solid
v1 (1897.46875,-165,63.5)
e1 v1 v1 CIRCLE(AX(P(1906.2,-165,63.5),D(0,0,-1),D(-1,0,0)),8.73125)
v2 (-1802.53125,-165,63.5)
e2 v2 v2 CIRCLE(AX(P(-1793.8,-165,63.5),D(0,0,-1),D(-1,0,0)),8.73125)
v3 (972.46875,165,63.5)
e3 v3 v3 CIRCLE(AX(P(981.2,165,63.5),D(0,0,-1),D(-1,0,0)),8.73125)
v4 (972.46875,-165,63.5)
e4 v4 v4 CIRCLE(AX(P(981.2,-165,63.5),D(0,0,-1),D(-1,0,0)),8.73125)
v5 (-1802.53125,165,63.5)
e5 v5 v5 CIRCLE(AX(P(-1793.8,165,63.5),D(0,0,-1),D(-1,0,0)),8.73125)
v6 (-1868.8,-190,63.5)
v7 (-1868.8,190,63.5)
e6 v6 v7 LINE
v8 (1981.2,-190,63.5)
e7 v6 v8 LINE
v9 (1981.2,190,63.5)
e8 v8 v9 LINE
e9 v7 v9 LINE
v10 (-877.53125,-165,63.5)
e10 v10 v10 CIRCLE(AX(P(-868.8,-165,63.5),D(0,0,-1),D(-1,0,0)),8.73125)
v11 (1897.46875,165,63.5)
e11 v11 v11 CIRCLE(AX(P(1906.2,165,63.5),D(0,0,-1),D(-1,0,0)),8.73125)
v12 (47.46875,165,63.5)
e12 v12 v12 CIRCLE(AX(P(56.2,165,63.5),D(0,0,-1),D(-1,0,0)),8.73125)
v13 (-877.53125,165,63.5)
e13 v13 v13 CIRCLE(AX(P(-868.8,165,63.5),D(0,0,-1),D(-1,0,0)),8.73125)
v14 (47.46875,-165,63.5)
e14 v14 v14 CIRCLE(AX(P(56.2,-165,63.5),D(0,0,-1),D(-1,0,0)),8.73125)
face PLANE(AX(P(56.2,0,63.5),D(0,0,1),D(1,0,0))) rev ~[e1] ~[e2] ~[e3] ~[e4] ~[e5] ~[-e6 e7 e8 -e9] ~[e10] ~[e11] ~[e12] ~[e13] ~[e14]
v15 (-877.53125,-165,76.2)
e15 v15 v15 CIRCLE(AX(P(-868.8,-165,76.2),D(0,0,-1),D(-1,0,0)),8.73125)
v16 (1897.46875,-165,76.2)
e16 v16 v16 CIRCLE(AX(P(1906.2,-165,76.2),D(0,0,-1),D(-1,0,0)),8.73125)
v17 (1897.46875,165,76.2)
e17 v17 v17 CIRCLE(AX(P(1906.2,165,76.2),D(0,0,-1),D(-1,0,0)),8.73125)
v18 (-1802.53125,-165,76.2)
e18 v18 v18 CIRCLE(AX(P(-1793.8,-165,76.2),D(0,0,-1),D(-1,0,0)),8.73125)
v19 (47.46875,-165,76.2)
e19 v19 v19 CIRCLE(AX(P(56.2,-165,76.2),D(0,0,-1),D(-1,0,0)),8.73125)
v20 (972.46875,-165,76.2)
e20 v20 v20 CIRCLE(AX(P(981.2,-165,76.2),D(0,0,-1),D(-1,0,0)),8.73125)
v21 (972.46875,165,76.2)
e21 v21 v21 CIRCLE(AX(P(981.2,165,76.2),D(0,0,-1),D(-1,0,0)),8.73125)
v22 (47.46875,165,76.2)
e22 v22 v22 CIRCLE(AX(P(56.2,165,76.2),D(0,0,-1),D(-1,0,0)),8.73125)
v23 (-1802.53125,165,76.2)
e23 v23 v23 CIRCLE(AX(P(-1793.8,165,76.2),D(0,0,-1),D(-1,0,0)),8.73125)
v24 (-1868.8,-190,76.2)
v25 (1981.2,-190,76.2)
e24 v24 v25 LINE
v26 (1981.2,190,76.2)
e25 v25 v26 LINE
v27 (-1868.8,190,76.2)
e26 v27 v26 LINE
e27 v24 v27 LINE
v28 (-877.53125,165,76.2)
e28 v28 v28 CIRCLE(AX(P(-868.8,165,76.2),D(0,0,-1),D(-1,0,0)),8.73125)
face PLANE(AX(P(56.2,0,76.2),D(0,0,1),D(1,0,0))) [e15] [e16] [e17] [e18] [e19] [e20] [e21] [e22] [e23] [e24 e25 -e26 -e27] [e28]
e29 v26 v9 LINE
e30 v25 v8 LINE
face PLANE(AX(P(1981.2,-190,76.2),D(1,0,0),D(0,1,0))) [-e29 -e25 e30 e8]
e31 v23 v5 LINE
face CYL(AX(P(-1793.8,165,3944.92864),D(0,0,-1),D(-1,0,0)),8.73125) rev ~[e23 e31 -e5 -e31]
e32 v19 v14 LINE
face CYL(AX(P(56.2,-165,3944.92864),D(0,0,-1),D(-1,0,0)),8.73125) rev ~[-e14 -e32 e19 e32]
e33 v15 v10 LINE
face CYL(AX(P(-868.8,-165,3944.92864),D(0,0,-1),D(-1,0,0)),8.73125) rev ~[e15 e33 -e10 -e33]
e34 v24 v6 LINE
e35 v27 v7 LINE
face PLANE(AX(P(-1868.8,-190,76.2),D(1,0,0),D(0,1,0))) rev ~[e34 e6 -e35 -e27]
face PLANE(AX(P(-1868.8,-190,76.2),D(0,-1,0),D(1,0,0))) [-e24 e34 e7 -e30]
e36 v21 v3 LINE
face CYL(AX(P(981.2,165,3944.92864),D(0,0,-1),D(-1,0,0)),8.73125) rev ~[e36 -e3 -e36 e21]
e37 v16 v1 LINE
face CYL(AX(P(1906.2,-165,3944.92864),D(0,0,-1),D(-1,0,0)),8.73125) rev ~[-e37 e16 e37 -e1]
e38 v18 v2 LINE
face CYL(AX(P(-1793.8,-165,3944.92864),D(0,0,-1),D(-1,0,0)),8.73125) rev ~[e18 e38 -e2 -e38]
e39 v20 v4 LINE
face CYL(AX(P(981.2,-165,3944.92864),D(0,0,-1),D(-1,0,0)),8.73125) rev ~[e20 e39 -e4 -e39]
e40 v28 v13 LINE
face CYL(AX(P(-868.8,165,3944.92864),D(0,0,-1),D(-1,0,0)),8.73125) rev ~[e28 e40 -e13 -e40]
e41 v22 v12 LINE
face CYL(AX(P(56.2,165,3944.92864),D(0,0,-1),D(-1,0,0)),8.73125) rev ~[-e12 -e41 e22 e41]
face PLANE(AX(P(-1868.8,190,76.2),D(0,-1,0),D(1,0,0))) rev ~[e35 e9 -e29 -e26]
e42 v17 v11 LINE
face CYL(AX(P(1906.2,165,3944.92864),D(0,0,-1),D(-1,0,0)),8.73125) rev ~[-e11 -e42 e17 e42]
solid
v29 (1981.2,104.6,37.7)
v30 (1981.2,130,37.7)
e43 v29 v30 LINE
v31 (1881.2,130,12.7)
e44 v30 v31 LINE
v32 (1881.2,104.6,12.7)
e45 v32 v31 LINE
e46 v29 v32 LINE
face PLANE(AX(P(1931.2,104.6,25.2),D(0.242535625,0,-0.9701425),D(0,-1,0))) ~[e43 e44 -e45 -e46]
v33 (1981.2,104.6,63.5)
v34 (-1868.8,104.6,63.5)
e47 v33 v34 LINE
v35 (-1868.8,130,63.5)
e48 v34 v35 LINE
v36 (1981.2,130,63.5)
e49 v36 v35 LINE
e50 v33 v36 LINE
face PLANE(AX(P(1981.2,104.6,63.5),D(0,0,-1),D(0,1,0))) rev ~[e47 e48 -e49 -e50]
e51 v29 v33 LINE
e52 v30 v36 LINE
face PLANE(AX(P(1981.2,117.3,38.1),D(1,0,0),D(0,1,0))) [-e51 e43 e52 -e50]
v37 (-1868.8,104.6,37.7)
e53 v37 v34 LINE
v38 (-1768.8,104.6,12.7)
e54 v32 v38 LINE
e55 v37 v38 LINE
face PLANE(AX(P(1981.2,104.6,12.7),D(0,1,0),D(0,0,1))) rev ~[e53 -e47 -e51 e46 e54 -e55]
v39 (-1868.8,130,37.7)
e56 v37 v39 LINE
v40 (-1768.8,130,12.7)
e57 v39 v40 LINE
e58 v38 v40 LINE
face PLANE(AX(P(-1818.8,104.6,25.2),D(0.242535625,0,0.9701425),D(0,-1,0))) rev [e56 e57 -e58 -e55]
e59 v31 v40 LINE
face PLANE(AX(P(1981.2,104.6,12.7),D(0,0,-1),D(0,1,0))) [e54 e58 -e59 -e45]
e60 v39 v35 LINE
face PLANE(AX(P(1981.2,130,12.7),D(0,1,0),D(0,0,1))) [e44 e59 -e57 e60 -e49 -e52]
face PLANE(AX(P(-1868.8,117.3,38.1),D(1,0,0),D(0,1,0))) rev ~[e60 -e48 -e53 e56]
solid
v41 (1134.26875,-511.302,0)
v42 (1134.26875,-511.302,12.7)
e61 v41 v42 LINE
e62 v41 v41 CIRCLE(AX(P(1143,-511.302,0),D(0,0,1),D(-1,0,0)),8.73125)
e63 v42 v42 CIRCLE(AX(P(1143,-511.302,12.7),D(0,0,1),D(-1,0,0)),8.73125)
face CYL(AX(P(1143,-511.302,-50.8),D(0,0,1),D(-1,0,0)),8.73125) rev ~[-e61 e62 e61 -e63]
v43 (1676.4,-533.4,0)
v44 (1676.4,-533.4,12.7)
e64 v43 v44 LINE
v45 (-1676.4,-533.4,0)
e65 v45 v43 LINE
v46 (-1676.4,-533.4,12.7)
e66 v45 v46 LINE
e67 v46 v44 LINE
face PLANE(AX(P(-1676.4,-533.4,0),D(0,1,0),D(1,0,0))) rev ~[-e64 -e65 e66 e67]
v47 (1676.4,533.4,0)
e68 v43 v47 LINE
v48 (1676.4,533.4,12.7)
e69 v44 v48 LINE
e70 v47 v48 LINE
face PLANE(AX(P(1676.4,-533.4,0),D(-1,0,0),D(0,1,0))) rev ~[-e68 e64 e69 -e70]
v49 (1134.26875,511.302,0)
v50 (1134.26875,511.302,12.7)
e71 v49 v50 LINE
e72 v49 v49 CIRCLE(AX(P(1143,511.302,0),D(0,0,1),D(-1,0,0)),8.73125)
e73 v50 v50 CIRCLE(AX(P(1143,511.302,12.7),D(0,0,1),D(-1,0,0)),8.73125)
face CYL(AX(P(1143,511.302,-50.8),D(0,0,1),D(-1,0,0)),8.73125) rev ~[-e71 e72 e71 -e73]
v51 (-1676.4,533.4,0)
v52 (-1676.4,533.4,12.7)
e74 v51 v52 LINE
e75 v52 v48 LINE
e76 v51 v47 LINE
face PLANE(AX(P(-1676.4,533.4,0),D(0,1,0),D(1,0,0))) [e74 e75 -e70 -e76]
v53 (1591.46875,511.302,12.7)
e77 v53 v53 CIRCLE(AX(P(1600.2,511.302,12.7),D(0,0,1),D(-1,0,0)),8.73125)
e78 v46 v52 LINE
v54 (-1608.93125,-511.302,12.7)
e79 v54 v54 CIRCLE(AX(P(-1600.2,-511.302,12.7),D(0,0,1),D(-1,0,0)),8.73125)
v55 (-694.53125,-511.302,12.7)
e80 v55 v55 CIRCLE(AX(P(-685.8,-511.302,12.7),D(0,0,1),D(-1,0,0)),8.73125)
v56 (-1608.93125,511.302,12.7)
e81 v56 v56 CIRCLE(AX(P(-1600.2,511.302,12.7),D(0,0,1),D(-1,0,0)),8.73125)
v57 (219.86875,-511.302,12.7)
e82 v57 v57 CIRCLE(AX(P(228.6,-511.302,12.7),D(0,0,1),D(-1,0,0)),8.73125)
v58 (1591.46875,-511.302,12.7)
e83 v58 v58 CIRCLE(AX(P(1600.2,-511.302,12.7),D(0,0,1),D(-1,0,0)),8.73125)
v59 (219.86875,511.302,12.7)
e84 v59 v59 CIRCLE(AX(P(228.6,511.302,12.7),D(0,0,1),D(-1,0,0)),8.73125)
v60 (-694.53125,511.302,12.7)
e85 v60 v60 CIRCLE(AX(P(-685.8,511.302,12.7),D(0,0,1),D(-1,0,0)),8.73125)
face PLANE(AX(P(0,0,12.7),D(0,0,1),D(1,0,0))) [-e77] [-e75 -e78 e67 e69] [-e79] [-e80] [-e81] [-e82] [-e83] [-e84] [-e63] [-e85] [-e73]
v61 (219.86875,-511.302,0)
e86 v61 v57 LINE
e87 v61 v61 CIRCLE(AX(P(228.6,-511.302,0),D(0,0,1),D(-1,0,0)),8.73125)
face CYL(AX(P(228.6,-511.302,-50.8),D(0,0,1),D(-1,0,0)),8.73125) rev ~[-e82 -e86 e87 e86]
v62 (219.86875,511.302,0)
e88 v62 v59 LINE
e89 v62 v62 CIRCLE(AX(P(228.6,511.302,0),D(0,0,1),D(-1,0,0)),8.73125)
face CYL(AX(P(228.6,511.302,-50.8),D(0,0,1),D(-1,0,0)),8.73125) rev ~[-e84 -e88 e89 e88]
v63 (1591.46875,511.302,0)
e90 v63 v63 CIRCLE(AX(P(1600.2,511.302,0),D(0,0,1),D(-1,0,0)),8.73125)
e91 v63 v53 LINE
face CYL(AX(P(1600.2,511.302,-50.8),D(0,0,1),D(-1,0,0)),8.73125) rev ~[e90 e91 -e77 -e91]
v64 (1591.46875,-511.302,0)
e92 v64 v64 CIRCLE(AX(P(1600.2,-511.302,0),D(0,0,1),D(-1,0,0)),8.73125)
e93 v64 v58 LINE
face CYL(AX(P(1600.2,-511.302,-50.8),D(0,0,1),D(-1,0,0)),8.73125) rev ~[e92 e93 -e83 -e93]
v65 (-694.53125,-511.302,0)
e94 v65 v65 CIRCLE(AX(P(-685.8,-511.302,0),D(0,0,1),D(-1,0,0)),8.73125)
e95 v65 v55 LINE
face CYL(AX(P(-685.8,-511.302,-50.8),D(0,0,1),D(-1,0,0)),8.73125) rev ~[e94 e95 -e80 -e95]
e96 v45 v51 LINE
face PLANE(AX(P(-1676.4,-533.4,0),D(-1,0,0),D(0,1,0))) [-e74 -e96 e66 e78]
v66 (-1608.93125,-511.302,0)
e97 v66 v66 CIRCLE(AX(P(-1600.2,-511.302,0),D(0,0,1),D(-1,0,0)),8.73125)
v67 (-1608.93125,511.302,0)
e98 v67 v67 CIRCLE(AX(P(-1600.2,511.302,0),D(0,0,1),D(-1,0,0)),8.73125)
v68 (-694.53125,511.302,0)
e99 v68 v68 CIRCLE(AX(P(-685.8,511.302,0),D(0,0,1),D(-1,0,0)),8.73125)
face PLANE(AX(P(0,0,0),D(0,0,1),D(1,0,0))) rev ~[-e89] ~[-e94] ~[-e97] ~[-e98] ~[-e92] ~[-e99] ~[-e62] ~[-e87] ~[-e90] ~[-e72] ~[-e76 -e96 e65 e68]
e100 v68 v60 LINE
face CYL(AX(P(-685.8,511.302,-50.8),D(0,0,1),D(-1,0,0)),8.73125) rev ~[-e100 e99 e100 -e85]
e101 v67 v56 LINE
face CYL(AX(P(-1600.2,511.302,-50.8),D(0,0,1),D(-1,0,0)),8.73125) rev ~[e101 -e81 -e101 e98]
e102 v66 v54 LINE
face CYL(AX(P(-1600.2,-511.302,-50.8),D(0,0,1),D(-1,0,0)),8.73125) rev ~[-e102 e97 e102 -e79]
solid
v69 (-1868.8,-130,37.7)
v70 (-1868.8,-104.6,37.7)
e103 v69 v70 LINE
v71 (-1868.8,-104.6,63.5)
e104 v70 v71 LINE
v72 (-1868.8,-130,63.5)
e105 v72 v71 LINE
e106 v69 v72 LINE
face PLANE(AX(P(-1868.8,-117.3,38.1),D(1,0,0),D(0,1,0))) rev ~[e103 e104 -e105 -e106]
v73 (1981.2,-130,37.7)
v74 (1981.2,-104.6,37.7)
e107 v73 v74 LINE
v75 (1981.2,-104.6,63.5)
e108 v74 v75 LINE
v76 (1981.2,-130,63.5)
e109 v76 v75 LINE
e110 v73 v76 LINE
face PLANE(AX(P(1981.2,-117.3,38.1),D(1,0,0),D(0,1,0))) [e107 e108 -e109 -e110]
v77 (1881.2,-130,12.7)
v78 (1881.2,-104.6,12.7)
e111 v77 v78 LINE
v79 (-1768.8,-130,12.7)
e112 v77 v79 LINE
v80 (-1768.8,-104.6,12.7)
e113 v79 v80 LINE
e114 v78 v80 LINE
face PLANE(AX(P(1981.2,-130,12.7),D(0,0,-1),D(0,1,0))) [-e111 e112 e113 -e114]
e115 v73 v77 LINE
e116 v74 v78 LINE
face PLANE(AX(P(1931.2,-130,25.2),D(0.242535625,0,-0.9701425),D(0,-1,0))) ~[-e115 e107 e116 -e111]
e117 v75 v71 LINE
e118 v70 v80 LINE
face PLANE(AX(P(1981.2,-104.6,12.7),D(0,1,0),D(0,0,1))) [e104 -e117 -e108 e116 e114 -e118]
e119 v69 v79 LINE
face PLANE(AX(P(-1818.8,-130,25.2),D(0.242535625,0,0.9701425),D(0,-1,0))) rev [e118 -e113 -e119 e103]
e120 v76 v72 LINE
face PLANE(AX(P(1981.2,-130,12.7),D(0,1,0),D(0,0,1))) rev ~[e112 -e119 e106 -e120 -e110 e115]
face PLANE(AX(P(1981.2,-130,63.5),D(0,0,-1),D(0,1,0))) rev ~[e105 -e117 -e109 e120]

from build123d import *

# Parameters (mm, degrees)
F0_W      = 3352.8
F0_H      = 1066.8
F1_DEPTH  = 12.7
F2_D      = 17.4625
F2_DEPTH  = 50.8
F2_TIP    = 5.2462642799
F4_W      = 3850
F4_H      = 380
F5_DEPTH  = 12.7
F7_D      = 17.4625
F8_W      = 25.4
F8_H      = 50.8
F9_DEPTH  = 3850
F10_SIZE2 = 100
F10_SIZE  = 25
F11_SIZE2 = 100
F11_SIZE  = 25
F12_SIZE2 = 100
F12_SIZE  = 25
F13_SIZE2 = 100
F13_SIZE  = 25


# Not quite as in the source:
# - a length typed as a fraction of an inch, garbled in the dataset ("3 / 203.2 mm" for 3/8 in), is restored


with BuildPart() as f1:
    # F0 (on Top) → F1 (new body)
    with BuildSketch(Plane.XY):
        Rectangle(F0_W, F0_H)
    extrude(amount=F1_DEPTH)

    # F2
    with Locations(Plane(origin=(0, 0, 0), x_dir=(1, 0, 0), z_dir=(0, 0, -1))):
        with Locations((-1600.2, -511.302), (-685.8, -511.302), (228.6, -511.302), (1143, -511.302), (1600.2, -511.302), (1600.2, 511.302), (1143, 511.302), (228.6, 511.302), (-685.8, 511.302), (-1600.2, 511.302)):
            Hole(F2_D / 2, depth=F2_DEPTH)
            with Locations((0, 0, -(F2_DEPTH + F2_TIP / 2))):  # 118° drill point
                Cone(0, F2_D / 2, F2_TIP, mode=Mode.SUBTRACT)


with BuildPart() as f5:
    # F4 (on offset) → F5 (new body)
    with BuildSketch(Plane.XY.offset(76.2)):
        with Locations((56.2, 0)):
            Rectangle(F4_W, F4_H)
    extrude(amount=-F5_DEPTH)

    # F7 (through all)
    with Locations(Plane.XY.offset(76.2)):
        with Locations((-1793.8, 165), (-1793.8, -165), (-868.8, 165), (-868.8, -165), (56.2, 165), (981.2, 165), (56.2, -165), (981.2, -165), (1906.2, 165), (1906.2, -165)):
            Hole(F7_D / 2)


with BuildPart() as f9:
    # F8 (on face) → F9 (new body)
    with BuildSketch(Plane.YZ.offset(1981.2)):
        with Locations((-117.3, 38.1)):
            Rectangle(F8_W, F8_H)
    extrude(amount=-F9_DEPTH)

    # F11
    f11_edges = [f9.edges().sort_by_distance(p)[0] for p in [
        (-1868.8, -117.3, 12.7),
    ]]
    f11_side = f9.faces().sort_by_distance((-1868.8, -117.3, 38.1))[0]
    chamfer(f11_edges, length=F11_SIZE, length2=F11_SIZE2, reference=f11_side)

    # F13
    f13_edges = [f9.edges().sort_by_distance(p)[0] for p in [
        (1981.2, -117.3, 12.7),
    ]]
    f13_side = f9.faces().sort_by_distance((1981.2, -117.3, 38.1))[0]
    chamfer(f13_edges, length=F13_SIZE, length2=F13_SIZE2, reference=f13_side)


with BuildPart() as f9b:
    # F8 (on face) → F9, piece 2 (new body)
    with BuildSketch(Plane.YZ.offset(1981.2)):
        with Locations((117.3, 38.1)):
            Rectangle(F8_W, F8_H)
    extrude(amount=-F9_DEPTH)

    # F10
    f10_edges = [f9b.edges().sort_by_distance(p)[0] for p in [
        (-1868.8, 117.3, 12.7),
    ]]
    f10_side = f9b.faces().sort_by_distance((-1868.8, 117.3, 38.1))[0]
    chamfer(f10_edges, length=F10_SIZE, length2=F10_SIZE2, reference=f10_side)

    # F12
    f12_edges = [f9b.edges().sort_by_distance(p)[0] for p in [
        (1981.2, 117.3, 12.7),
    ]]
    f12_side = f9b.faces().sort_by_distance((1981.2, 117.3, 38.1))[0]
    chamfer(f12_edges, length=F12_SIZE, length2=F12_SIZE2, reference=f12_side)


solid = Compound([f1.part, f5.part, f9.part, f9b.part])
